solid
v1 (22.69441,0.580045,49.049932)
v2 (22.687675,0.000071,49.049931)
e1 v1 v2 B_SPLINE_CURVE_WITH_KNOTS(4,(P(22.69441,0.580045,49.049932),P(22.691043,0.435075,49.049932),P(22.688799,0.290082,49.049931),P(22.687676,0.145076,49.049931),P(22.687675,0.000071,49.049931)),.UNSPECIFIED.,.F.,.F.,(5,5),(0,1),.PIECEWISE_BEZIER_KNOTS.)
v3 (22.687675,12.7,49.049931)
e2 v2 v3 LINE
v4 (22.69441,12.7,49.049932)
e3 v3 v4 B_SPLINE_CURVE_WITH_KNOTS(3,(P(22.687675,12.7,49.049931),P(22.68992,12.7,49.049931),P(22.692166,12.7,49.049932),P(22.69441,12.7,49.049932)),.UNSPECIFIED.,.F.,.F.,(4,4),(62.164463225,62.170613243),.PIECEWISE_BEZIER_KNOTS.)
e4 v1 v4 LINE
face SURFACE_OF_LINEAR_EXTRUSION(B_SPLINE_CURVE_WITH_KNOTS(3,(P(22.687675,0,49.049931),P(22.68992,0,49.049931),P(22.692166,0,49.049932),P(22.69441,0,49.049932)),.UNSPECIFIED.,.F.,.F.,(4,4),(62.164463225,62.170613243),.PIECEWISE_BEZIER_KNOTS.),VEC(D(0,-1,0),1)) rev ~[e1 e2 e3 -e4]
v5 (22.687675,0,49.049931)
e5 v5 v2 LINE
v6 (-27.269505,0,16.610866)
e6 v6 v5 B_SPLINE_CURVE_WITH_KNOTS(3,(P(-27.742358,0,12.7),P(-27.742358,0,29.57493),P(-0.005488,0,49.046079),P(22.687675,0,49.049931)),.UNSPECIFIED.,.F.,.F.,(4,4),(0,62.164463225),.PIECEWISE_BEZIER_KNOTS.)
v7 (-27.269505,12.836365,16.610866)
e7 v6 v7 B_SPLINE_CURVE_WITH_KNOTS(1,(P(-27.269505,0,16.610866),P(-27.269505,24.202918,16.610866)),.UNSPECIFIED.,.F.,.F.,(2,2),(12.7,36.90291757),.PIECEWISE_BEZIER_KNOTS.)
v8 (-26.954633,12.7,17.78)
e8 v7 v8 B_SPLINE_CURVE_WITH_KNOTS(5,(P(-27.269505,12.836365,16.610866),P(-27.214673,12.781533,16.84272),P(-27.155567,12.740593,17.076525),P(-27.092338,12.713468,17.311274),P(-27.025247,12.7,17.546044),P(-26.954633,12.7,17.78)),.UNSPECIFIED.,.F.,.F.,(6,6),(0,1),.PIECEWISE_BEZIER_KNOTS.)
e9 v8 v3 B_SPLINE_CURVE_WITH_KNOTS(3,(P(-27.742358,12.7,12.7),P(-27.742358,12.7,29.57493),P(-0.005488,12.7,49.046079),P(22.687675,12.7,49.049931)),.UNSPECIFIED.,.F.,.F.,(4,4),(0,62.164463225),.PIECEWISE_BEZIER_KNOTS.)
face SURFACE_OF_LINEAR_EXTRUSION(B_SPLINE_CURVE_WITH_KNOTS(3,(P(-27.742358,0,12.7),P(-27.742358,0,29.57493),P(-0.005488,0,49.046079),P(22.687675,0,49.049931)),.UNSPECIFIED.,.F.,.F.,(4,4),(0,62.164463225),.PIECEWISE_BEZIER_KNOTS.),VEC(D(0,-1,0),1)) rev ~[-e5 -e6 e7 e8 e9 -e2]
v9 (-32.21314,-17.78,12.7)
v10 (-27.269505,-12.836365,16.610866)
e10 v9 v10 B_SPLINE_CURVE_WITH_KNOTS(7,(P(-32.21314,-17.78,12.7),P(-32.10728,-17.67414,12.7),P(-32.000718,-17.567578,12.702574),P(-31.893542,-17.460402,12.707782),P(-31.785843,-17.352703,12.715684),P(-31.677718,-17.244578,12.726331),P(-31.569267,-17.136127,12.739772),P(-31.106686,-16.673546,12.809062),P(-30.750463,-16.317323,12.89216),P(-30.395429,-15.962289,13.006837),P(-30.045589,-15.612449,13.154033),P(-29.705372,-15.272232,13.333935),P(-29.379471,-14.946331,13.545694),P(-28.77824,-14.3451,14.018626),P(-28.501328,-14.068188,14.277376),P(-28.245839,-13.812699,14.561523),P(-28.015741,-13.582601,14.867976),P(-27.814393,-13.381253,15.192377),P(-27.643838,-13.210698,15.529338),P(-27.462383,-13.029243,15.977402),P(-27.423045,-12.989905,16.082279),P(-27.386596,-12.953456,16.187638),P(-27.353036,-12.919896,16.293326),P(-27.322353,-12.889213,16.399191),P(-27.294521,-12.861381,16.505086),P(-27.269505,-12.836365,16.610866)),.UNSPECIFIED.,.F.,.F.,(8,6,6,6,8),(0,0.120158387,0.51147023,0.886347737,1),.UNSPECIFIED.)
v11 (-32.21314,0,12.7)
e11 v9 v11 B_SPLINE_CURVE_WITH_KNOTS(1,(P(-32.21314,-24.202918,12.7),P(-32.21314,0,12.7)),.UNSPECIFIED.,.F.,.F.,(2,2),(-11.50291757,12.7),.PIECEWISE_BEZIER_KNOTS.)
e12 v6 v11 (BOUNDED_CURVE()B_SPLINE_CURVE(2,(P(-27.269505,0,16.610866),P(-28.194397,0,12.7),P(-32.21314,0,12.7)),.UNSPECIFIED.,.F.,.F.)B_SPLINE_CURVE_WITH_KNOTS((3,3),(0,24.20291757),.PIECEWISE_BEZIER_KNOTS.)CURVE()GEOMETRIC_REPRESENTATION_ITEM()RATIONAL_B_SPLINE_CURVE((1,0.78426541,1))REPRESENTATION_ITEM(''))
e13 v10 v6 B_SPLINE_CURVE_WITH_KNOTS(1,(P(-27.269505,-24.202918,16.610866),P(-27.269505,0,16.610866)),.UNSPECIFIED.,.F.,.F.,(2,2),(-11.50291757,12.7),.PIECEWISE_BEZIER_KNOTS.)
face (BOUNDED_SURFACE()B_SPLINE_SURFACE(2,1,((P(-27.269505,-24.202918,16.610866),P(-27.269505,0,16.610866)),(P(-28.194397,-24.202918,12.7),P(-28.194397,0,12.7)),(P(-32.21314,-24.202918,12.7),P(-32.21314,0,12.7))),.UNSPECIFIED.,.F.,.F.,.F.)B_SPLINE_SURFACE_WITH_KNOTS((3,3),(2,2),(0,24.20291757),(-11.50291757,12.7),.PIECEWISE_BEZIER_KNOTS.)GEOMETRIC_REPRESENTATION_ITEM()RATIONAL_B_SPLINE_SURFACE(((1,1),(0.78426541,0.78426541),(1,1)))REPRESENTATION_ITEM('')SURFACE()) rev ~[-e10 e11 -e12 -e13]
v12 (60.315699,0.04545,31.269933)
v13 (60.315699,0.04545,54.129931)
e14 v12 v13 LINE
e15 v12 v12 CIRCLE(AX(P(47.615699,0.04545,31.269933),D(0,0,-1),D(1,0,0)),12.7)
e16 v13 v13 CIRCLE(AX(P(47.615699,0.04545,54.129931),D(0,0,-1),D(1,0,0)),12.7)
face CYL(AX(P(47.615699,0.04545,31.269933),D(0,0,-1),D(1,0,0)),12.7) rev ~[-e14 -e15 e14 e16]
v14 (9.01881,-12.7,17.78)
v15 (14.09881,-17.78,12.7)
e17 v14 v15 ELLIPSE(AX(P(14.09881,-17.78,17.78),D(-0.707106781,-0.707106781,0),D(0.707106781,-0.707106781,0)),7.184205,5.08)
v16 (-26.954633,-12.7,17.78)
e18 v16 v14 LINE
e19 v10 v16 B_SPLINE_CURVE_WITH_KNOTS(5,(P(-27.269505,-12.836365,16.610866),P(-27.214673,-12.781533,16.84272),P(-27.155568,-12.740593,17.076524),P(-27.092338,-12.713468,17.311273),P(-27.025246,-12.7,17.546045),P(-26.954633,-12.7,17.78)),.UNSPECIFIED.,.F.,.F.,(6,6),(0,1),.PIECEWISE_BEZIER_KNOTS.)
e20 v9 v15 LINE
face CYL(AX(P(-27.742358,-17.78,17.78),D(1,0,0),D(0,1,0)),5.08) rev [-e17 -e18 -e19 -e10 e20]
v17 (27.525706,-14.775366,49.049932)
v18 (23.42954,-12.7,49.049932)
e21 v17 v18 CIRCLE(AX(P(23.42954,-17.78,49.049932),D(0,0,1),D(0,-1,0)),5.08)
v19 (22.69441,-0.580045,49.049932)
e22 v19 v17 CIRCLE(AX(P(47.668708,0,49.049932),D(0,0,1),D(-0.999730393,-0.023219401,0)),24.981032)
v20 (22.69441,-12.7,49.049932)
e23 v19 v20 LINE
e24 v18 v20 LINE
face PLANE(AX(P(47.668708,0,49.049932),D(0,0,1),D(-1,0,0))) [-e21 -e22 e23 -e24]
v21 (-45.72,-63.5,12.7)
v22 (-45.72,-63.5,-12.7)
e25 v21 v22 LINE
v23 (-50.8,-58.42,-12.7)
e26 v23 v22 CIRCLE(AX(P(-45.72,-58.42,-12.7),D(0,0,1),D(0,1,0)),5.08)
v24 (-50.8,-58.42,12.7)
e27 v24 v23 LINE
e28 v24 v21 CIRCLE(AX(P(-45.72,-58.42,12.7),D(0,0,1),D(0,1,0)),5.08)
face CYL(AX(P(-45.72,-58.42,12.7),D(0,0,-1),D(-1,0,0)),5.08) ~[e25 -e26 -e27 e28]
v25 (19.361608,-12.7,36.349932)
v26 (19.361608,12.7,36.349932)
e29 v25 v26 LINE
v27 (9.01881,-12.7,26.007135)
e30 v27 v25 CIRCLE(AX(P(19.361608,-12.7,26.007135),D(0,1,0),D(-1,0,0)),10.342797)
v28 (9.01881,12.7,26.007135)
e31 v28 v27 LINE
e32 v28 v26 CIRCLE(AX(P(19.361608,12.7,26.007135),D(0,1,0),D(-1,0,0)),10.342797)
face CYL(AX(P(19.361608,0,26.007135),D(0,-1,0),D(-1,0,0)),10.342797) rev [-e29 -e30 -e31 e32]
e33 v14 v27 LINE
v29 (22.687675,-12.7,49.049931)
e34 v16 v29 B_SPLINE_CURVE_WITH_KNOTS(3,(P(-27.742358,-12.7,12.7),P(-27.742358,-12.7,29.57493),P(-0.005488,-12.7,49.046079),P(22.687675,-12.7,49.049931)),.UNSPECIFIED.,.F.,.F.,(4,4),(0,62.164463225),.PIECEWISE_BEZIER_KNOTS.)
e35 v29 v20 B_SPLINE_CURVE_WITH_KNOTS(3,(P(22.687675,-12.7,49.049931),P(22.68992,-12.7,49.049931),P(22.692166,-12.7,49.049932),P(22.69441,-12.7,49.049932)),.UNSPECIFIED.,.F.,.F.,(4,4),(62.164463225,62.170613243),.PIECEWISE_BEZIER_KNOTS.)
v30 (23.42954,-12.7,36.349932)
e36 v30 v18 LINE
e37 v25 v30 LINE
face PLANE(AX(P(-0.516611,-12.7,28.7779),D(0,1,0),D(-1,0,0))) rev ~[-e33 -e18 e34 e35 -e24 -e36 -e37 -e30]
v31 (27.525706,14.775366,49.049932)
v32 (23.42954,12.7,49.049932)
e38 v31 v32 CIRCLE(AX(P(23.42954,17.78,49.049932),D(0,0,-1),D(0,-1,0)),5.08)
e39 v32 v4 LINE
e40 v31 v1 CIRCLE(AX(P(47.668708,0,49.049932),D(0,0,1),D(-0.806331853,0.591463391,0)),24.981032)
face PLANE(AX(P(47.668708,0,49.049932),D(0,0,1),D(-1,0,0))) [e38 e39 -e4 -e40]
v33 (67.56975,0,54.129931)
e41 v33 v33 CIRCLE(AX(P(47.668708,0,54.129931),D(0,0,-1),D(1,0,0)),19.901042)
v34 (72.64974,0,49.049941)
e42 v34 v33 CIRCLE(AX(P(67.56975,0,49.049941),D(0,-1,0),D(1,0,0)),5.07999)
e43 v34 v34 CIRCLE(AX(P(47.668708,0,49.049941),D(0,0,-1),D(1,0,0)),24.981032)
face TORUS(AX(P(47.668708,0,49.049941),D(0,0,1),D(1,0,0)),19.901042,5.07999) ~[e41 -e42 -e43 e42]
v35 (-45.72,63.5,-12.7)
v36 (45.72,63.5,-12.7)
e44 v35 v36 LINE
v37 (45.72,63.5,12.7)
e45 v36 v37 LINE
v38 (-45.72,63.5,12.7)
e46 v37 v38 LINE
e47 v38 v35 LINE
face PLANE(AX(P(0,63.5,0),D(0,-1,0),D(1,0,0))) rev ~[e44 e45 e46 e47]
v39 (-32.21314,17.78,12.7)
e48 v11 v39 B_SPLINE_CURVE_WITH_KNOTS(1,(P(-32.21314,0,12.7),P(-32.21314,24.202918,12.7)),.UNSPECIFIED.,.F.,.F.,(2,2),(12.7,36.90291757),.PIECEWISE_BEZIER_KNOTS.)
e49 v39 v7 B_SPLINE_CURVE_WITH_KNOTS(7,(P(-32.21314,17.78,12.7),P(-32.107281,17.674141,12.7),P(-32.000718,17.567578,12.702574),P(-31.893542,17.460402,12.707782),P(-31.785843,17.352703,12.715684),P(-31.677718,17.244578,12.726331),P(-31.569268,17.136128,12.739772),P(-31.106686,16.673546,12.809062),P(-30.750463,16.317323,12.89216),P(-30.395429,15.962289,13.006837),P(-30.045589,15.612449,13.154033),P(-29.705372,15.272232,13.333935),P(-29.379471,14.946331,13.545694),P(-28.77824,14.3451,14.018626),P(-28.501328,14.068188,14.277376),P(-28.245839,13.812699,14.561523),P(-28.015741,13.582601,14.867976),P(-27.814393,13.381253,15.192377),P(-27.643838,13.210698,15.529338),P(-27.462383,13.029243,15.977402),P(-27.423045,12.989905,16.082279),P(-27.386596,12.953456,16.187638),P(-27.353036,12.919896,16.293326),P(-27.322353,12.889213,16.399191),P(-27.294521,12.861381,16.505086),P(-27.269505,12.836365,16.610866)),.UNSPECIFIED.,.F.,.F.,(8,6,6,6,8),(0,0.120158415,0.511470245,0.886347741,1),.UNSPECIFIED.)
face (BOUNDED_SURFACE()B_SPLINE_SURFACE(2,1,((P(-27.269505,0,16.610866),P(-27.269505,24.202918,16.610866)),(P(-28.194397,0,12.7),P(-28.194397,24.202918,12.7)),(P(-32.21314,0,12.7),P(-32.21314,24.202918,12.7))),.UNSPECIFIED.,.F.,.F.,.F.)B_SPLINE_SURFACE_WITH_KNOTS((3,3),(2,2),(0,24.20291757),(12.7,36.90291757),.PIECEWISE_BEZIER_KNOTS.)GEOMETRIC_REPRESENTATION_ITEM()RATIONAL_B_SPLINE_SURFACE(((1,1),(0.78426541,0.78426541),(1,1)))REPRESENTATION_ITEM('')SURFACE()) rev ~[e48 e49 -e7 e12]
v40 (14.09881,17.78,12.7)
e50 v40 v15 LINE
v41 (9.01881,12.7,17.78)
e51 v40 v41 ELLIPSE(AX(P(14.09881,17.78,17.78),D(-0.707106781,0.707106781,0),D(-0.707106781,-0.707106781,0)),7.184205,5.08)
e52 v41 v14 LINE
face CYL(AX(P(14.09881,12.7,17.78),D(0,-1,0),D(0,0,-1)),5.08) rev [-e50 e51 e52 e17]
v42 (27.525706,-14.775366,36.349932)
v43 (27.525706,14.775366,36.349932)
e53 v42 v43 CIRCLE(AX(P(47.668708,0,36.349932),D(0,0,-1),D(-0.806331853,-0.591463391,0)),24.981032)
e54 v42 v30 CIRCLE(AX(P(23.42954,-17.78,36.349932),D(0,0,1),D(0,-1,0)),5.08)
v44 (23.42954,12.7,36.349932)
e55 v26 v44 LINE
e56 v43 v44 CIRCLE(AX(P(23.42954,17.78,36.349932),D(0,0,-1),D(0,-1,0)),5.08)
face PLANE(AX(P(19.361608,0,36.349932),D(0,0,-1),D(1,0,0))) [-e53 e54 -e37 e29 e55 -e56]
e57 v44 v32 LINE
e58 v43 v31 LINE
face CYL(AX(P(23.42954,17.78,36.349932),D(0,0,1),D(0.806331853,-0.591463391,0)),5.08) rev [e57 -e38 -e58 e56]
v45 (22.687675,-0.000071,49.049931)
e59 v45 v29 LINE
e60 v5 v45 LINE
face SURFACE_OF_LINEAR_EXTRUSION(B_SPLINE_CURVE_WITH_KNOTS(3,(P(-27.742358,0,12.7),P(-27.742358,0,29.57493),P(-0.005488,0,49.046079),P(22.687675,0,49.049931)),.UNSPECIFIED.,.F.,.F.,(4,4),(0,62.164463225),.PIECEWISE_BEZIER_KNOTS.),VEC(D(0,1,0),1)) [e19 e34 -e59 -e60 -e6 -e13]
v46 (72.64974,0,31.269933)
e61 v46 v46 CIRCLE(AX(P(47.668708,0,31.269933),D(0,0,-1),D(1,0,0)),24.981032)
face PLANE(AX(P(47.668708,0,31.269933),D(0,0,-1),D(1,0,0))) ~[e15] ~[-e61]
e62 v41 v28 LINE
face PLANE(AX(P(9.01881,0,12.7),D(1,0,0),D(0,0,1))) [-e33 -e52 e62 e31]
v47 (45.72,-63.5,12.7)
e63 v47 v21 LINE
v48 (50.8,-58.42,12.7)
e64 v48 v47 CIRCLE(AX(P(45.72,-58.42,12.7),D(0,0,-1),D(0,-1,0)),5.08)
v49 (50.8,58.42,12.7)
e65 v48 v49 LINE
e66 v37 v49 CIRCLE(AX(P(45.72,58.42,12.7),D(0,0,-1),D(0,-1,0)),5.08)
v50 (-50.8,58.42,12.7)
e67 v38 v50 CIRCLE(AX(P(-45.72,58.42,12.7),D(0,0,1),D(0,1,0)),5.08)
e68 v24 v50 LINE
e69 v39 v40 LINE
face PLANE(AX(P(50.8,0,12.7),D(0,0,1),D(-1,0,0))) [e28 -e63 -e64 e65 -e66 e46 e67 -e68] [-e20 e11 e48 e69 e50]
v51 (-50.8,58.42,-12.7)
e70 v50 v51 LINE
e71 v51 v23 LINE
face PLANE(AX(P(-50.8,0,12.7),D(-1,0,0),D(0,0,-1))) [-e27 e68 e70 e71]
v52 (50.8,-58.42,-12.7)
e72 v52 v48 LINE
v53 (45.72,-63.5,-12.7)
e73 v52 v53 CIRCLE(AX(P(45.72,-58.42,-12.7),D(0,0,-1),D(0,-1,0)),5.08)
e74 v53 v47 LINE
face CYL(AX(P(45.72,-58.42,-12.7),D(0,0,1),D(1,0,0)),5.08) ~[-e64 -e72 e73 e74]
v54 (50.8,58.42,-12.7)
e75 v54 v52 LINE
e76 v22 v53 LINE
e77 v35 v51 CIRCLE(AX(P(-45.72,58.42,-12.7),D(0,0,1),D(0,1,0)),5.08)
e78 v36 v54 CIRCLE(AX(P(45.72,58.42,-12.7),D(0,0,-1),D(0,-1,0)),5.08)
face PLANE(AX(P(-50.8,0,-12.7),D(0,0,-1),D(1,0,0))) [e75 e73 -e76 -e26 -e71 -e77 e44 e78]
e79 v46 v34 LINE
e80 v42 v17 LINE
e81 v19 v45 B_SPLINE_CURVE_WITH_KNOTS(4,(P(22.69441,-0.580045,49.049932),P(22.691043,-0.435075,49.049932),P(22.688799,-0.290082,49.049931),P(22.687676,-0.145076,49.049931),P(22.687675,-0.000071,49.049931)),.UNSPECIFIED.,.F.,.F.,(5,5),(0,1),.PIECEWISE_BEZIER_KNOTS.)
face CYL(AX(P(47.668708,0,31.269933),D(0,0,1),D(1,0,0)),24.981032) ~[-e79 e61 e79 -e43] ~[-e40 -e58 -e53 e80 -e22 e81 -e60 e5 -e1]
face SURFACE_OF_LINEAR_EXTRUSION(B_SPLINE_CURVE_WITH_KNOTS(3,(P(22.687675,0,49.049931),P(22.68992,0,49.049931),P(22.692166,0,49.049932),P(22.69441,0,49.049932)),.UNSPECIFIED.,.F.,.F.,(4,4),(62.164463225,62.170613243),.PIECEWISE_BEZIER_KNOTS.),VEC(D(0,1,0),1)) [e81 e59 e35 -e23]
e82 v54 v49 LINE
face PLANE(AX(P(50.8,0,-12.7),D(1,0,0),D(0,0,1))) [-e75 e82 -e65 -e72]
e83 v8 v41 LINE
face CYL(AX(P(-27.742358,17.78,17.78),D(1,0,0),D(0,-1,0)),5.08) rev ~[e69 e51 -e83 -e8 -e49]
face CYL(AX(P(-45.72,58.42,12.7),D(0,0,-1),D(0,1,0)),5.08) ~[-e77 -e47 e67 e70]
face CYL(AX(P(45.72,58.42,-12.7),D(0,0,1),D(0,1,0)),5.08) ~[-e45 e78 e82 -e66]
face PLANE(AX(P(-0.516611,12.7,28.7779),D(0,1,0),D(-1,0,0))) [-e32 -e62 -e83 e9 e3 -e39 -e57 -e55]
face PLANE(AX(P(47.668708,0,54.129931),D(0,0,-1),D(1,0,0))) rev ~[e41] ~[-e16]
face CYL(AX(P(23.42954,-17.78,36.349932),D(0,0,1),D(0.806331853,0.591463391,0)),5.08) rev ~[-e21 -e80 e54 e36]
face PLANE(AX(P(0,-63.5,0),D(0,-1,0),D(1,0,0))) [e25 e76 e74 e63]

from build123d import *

# Parameters (mm, degrees)
F1_DEPTH  = 63.5
F2_DEPTH  = 63.5
F3_DEPTH  = 12.7
F5_R      = 5.08
F6_R      = 5.08
F7_R      = 5.07999
F10_D     = 25.4
F10_DEPTH = 22.8609980474


# Not quite as in the source:
# - a fillet or chamfer is up to 0.001 mm smaller than in the source, because OpenCascade refuses the exact size


with BuildPart() as f1:
    # F0 (on Front) → F1 (new body, symmetric)
    with BuildSketch(Plane.XZ):
        Polygon((-27.7423580625, 12.7), (-50.8, 12.7), (-50.8, -12.7), (50.8, -12.7), (50.8, 12.7), (9.0188104659, 12.7), align=None)
    extrude(amount=F1_DEPTH, both=True)

    # F0 (on Front) → F2 (join, symmetric)
    with BuildSketch(Plane.XZ):
        Polygon((-27.7423580625, 12.7), (-50.8, 12.7), (-50.8, -12.7), (50.8, -12.7), (50.8, 12.7), (9.0188104659, 12.7), align=None)
    extrude(amount=F2_DEPTH, both=True)

    # F0 (on Front) → F3 (join, symmetric)
    with BuildSketch(Plane.XZ):
        with BuildLine():
            add(Edge.make_bspline(
                [(-27.7423580625, 12.7), (-27.7423580625, 29.5749301373), (-0.0054883666, 49.0460789908), (22.6876754314, 49.0499310609)],
                knots=[0, 0, 0, 0, 62.1644632252, 62.1644632252, 62.1644632252, 62.1644632252], degree=3))
            Line((-27.7423580625, 12.7), (9.0188104659, 12.7))
            Line((9.0188104659, 12.7), (9.0188104659, 26.0071345331))
            ThreePointArc((9.0188104659, 26.0071345331), (12.0481455999, 33.3205964986), (19.3616075654, 36.3499316326))
            Line((19.3616075654, 36.3499316326), (22.6876754314, 36.3499316326))
            Line((22.6876754314, 36.3499316326), (22.6876754314, 49.0499310609))
        make_face()
        with BuildLine():
            add(Edge.make_bspline(
                [(22.6876754314, 49.0499310609), (22.689920498, 49.049931442), (22.6921655153, 49.0499316326), (22.6944104832, 49.0499316326)],
                knots=[62.1644632252, 62.1644632252, 62.1644632252, 62.1644632252, 62.1706132431, 62.1706132431, 62.1706132431, 62.1706132431], degree=3))
            Line((22.6876754314, 49.0499310609), (22.6876754314, 36.3499316326))
            Line((22.6876754314, 36.3499316326), (47.668707557, 36.3499316326))
            Line((47.668707557, 36.3499316326), (47.668707557, 49.0499316326))
            Line((47.668707557, 49.0499316326), (22.6944104832, 49.0499316326))
        make_face()
    extrude(amount=F3_DEPTH, both=True)

    # F0 (on Front) → F4 (revolve)
    with BuildSketch(Plane.XZ):
        Polygon((72.6497396827, 54.1299306562), (47.668707557, 54.1299306562), (47.668707557, 49.0499316326), (47.668707557, 36.3499316326), (47.668707557, 31.2699326089), (72.6497396827, 31.2699326089), align=None)
    revolve(axis=Axis((47.668707557, 0, 42.6999316326), (0, 0, -1)))

    # F5
    f5_edges = [f1.edges().sort_by_distance(p)[0] for p in [
        (-9.361774, -12.7, 12.7),
        (9.01881, 0, 12.7),
        (-27.742358, 6.35, 12.7),
        (-27.742358, -6.35, 12.7),
        (-9.361774, 12.7, 12.7),
        (-50.8, -63.5, 0),
        (-50.8, 63.5, 0),
        (50.8, -63.5, 0),
        (50.8, 63.5, 0),
    ]]
    fillet(f5_edges, radius=F5_R)

    # F6
    f6_edges = [f1.edges().sort_by_distance(p)[0] for p in [
        (26.156805, -12.7, 42.699932),
        (26.156805, 12.7, 42.699932),
    ]]
    fillet(f6_edges, radius=F6_R)

    # F7 (radius 5.08 in the source; OpenCascade refuses exactly that, so slightly less here)
    f7_edges = [f1.edges().sort_by_distance(p)[0] for p in [
        (22.687675, 0, 54.129931),
    ]]
    fillet(f7_edges, radius=F7_R)

    # F10 (through all, one way)
    with BuildSketch(Plane(origin=(0, 0, 31.2699326089), x_dir=(1, 0, 0), z_dir=(0, 0, -1))):
        with Locations((47.61569947, -0.0454496221)):
            Circle(F10_D / 2)
    extrude(amount=-F10_DEPTH, mode=Mode.SUBTRACT)


solid = f1.part
